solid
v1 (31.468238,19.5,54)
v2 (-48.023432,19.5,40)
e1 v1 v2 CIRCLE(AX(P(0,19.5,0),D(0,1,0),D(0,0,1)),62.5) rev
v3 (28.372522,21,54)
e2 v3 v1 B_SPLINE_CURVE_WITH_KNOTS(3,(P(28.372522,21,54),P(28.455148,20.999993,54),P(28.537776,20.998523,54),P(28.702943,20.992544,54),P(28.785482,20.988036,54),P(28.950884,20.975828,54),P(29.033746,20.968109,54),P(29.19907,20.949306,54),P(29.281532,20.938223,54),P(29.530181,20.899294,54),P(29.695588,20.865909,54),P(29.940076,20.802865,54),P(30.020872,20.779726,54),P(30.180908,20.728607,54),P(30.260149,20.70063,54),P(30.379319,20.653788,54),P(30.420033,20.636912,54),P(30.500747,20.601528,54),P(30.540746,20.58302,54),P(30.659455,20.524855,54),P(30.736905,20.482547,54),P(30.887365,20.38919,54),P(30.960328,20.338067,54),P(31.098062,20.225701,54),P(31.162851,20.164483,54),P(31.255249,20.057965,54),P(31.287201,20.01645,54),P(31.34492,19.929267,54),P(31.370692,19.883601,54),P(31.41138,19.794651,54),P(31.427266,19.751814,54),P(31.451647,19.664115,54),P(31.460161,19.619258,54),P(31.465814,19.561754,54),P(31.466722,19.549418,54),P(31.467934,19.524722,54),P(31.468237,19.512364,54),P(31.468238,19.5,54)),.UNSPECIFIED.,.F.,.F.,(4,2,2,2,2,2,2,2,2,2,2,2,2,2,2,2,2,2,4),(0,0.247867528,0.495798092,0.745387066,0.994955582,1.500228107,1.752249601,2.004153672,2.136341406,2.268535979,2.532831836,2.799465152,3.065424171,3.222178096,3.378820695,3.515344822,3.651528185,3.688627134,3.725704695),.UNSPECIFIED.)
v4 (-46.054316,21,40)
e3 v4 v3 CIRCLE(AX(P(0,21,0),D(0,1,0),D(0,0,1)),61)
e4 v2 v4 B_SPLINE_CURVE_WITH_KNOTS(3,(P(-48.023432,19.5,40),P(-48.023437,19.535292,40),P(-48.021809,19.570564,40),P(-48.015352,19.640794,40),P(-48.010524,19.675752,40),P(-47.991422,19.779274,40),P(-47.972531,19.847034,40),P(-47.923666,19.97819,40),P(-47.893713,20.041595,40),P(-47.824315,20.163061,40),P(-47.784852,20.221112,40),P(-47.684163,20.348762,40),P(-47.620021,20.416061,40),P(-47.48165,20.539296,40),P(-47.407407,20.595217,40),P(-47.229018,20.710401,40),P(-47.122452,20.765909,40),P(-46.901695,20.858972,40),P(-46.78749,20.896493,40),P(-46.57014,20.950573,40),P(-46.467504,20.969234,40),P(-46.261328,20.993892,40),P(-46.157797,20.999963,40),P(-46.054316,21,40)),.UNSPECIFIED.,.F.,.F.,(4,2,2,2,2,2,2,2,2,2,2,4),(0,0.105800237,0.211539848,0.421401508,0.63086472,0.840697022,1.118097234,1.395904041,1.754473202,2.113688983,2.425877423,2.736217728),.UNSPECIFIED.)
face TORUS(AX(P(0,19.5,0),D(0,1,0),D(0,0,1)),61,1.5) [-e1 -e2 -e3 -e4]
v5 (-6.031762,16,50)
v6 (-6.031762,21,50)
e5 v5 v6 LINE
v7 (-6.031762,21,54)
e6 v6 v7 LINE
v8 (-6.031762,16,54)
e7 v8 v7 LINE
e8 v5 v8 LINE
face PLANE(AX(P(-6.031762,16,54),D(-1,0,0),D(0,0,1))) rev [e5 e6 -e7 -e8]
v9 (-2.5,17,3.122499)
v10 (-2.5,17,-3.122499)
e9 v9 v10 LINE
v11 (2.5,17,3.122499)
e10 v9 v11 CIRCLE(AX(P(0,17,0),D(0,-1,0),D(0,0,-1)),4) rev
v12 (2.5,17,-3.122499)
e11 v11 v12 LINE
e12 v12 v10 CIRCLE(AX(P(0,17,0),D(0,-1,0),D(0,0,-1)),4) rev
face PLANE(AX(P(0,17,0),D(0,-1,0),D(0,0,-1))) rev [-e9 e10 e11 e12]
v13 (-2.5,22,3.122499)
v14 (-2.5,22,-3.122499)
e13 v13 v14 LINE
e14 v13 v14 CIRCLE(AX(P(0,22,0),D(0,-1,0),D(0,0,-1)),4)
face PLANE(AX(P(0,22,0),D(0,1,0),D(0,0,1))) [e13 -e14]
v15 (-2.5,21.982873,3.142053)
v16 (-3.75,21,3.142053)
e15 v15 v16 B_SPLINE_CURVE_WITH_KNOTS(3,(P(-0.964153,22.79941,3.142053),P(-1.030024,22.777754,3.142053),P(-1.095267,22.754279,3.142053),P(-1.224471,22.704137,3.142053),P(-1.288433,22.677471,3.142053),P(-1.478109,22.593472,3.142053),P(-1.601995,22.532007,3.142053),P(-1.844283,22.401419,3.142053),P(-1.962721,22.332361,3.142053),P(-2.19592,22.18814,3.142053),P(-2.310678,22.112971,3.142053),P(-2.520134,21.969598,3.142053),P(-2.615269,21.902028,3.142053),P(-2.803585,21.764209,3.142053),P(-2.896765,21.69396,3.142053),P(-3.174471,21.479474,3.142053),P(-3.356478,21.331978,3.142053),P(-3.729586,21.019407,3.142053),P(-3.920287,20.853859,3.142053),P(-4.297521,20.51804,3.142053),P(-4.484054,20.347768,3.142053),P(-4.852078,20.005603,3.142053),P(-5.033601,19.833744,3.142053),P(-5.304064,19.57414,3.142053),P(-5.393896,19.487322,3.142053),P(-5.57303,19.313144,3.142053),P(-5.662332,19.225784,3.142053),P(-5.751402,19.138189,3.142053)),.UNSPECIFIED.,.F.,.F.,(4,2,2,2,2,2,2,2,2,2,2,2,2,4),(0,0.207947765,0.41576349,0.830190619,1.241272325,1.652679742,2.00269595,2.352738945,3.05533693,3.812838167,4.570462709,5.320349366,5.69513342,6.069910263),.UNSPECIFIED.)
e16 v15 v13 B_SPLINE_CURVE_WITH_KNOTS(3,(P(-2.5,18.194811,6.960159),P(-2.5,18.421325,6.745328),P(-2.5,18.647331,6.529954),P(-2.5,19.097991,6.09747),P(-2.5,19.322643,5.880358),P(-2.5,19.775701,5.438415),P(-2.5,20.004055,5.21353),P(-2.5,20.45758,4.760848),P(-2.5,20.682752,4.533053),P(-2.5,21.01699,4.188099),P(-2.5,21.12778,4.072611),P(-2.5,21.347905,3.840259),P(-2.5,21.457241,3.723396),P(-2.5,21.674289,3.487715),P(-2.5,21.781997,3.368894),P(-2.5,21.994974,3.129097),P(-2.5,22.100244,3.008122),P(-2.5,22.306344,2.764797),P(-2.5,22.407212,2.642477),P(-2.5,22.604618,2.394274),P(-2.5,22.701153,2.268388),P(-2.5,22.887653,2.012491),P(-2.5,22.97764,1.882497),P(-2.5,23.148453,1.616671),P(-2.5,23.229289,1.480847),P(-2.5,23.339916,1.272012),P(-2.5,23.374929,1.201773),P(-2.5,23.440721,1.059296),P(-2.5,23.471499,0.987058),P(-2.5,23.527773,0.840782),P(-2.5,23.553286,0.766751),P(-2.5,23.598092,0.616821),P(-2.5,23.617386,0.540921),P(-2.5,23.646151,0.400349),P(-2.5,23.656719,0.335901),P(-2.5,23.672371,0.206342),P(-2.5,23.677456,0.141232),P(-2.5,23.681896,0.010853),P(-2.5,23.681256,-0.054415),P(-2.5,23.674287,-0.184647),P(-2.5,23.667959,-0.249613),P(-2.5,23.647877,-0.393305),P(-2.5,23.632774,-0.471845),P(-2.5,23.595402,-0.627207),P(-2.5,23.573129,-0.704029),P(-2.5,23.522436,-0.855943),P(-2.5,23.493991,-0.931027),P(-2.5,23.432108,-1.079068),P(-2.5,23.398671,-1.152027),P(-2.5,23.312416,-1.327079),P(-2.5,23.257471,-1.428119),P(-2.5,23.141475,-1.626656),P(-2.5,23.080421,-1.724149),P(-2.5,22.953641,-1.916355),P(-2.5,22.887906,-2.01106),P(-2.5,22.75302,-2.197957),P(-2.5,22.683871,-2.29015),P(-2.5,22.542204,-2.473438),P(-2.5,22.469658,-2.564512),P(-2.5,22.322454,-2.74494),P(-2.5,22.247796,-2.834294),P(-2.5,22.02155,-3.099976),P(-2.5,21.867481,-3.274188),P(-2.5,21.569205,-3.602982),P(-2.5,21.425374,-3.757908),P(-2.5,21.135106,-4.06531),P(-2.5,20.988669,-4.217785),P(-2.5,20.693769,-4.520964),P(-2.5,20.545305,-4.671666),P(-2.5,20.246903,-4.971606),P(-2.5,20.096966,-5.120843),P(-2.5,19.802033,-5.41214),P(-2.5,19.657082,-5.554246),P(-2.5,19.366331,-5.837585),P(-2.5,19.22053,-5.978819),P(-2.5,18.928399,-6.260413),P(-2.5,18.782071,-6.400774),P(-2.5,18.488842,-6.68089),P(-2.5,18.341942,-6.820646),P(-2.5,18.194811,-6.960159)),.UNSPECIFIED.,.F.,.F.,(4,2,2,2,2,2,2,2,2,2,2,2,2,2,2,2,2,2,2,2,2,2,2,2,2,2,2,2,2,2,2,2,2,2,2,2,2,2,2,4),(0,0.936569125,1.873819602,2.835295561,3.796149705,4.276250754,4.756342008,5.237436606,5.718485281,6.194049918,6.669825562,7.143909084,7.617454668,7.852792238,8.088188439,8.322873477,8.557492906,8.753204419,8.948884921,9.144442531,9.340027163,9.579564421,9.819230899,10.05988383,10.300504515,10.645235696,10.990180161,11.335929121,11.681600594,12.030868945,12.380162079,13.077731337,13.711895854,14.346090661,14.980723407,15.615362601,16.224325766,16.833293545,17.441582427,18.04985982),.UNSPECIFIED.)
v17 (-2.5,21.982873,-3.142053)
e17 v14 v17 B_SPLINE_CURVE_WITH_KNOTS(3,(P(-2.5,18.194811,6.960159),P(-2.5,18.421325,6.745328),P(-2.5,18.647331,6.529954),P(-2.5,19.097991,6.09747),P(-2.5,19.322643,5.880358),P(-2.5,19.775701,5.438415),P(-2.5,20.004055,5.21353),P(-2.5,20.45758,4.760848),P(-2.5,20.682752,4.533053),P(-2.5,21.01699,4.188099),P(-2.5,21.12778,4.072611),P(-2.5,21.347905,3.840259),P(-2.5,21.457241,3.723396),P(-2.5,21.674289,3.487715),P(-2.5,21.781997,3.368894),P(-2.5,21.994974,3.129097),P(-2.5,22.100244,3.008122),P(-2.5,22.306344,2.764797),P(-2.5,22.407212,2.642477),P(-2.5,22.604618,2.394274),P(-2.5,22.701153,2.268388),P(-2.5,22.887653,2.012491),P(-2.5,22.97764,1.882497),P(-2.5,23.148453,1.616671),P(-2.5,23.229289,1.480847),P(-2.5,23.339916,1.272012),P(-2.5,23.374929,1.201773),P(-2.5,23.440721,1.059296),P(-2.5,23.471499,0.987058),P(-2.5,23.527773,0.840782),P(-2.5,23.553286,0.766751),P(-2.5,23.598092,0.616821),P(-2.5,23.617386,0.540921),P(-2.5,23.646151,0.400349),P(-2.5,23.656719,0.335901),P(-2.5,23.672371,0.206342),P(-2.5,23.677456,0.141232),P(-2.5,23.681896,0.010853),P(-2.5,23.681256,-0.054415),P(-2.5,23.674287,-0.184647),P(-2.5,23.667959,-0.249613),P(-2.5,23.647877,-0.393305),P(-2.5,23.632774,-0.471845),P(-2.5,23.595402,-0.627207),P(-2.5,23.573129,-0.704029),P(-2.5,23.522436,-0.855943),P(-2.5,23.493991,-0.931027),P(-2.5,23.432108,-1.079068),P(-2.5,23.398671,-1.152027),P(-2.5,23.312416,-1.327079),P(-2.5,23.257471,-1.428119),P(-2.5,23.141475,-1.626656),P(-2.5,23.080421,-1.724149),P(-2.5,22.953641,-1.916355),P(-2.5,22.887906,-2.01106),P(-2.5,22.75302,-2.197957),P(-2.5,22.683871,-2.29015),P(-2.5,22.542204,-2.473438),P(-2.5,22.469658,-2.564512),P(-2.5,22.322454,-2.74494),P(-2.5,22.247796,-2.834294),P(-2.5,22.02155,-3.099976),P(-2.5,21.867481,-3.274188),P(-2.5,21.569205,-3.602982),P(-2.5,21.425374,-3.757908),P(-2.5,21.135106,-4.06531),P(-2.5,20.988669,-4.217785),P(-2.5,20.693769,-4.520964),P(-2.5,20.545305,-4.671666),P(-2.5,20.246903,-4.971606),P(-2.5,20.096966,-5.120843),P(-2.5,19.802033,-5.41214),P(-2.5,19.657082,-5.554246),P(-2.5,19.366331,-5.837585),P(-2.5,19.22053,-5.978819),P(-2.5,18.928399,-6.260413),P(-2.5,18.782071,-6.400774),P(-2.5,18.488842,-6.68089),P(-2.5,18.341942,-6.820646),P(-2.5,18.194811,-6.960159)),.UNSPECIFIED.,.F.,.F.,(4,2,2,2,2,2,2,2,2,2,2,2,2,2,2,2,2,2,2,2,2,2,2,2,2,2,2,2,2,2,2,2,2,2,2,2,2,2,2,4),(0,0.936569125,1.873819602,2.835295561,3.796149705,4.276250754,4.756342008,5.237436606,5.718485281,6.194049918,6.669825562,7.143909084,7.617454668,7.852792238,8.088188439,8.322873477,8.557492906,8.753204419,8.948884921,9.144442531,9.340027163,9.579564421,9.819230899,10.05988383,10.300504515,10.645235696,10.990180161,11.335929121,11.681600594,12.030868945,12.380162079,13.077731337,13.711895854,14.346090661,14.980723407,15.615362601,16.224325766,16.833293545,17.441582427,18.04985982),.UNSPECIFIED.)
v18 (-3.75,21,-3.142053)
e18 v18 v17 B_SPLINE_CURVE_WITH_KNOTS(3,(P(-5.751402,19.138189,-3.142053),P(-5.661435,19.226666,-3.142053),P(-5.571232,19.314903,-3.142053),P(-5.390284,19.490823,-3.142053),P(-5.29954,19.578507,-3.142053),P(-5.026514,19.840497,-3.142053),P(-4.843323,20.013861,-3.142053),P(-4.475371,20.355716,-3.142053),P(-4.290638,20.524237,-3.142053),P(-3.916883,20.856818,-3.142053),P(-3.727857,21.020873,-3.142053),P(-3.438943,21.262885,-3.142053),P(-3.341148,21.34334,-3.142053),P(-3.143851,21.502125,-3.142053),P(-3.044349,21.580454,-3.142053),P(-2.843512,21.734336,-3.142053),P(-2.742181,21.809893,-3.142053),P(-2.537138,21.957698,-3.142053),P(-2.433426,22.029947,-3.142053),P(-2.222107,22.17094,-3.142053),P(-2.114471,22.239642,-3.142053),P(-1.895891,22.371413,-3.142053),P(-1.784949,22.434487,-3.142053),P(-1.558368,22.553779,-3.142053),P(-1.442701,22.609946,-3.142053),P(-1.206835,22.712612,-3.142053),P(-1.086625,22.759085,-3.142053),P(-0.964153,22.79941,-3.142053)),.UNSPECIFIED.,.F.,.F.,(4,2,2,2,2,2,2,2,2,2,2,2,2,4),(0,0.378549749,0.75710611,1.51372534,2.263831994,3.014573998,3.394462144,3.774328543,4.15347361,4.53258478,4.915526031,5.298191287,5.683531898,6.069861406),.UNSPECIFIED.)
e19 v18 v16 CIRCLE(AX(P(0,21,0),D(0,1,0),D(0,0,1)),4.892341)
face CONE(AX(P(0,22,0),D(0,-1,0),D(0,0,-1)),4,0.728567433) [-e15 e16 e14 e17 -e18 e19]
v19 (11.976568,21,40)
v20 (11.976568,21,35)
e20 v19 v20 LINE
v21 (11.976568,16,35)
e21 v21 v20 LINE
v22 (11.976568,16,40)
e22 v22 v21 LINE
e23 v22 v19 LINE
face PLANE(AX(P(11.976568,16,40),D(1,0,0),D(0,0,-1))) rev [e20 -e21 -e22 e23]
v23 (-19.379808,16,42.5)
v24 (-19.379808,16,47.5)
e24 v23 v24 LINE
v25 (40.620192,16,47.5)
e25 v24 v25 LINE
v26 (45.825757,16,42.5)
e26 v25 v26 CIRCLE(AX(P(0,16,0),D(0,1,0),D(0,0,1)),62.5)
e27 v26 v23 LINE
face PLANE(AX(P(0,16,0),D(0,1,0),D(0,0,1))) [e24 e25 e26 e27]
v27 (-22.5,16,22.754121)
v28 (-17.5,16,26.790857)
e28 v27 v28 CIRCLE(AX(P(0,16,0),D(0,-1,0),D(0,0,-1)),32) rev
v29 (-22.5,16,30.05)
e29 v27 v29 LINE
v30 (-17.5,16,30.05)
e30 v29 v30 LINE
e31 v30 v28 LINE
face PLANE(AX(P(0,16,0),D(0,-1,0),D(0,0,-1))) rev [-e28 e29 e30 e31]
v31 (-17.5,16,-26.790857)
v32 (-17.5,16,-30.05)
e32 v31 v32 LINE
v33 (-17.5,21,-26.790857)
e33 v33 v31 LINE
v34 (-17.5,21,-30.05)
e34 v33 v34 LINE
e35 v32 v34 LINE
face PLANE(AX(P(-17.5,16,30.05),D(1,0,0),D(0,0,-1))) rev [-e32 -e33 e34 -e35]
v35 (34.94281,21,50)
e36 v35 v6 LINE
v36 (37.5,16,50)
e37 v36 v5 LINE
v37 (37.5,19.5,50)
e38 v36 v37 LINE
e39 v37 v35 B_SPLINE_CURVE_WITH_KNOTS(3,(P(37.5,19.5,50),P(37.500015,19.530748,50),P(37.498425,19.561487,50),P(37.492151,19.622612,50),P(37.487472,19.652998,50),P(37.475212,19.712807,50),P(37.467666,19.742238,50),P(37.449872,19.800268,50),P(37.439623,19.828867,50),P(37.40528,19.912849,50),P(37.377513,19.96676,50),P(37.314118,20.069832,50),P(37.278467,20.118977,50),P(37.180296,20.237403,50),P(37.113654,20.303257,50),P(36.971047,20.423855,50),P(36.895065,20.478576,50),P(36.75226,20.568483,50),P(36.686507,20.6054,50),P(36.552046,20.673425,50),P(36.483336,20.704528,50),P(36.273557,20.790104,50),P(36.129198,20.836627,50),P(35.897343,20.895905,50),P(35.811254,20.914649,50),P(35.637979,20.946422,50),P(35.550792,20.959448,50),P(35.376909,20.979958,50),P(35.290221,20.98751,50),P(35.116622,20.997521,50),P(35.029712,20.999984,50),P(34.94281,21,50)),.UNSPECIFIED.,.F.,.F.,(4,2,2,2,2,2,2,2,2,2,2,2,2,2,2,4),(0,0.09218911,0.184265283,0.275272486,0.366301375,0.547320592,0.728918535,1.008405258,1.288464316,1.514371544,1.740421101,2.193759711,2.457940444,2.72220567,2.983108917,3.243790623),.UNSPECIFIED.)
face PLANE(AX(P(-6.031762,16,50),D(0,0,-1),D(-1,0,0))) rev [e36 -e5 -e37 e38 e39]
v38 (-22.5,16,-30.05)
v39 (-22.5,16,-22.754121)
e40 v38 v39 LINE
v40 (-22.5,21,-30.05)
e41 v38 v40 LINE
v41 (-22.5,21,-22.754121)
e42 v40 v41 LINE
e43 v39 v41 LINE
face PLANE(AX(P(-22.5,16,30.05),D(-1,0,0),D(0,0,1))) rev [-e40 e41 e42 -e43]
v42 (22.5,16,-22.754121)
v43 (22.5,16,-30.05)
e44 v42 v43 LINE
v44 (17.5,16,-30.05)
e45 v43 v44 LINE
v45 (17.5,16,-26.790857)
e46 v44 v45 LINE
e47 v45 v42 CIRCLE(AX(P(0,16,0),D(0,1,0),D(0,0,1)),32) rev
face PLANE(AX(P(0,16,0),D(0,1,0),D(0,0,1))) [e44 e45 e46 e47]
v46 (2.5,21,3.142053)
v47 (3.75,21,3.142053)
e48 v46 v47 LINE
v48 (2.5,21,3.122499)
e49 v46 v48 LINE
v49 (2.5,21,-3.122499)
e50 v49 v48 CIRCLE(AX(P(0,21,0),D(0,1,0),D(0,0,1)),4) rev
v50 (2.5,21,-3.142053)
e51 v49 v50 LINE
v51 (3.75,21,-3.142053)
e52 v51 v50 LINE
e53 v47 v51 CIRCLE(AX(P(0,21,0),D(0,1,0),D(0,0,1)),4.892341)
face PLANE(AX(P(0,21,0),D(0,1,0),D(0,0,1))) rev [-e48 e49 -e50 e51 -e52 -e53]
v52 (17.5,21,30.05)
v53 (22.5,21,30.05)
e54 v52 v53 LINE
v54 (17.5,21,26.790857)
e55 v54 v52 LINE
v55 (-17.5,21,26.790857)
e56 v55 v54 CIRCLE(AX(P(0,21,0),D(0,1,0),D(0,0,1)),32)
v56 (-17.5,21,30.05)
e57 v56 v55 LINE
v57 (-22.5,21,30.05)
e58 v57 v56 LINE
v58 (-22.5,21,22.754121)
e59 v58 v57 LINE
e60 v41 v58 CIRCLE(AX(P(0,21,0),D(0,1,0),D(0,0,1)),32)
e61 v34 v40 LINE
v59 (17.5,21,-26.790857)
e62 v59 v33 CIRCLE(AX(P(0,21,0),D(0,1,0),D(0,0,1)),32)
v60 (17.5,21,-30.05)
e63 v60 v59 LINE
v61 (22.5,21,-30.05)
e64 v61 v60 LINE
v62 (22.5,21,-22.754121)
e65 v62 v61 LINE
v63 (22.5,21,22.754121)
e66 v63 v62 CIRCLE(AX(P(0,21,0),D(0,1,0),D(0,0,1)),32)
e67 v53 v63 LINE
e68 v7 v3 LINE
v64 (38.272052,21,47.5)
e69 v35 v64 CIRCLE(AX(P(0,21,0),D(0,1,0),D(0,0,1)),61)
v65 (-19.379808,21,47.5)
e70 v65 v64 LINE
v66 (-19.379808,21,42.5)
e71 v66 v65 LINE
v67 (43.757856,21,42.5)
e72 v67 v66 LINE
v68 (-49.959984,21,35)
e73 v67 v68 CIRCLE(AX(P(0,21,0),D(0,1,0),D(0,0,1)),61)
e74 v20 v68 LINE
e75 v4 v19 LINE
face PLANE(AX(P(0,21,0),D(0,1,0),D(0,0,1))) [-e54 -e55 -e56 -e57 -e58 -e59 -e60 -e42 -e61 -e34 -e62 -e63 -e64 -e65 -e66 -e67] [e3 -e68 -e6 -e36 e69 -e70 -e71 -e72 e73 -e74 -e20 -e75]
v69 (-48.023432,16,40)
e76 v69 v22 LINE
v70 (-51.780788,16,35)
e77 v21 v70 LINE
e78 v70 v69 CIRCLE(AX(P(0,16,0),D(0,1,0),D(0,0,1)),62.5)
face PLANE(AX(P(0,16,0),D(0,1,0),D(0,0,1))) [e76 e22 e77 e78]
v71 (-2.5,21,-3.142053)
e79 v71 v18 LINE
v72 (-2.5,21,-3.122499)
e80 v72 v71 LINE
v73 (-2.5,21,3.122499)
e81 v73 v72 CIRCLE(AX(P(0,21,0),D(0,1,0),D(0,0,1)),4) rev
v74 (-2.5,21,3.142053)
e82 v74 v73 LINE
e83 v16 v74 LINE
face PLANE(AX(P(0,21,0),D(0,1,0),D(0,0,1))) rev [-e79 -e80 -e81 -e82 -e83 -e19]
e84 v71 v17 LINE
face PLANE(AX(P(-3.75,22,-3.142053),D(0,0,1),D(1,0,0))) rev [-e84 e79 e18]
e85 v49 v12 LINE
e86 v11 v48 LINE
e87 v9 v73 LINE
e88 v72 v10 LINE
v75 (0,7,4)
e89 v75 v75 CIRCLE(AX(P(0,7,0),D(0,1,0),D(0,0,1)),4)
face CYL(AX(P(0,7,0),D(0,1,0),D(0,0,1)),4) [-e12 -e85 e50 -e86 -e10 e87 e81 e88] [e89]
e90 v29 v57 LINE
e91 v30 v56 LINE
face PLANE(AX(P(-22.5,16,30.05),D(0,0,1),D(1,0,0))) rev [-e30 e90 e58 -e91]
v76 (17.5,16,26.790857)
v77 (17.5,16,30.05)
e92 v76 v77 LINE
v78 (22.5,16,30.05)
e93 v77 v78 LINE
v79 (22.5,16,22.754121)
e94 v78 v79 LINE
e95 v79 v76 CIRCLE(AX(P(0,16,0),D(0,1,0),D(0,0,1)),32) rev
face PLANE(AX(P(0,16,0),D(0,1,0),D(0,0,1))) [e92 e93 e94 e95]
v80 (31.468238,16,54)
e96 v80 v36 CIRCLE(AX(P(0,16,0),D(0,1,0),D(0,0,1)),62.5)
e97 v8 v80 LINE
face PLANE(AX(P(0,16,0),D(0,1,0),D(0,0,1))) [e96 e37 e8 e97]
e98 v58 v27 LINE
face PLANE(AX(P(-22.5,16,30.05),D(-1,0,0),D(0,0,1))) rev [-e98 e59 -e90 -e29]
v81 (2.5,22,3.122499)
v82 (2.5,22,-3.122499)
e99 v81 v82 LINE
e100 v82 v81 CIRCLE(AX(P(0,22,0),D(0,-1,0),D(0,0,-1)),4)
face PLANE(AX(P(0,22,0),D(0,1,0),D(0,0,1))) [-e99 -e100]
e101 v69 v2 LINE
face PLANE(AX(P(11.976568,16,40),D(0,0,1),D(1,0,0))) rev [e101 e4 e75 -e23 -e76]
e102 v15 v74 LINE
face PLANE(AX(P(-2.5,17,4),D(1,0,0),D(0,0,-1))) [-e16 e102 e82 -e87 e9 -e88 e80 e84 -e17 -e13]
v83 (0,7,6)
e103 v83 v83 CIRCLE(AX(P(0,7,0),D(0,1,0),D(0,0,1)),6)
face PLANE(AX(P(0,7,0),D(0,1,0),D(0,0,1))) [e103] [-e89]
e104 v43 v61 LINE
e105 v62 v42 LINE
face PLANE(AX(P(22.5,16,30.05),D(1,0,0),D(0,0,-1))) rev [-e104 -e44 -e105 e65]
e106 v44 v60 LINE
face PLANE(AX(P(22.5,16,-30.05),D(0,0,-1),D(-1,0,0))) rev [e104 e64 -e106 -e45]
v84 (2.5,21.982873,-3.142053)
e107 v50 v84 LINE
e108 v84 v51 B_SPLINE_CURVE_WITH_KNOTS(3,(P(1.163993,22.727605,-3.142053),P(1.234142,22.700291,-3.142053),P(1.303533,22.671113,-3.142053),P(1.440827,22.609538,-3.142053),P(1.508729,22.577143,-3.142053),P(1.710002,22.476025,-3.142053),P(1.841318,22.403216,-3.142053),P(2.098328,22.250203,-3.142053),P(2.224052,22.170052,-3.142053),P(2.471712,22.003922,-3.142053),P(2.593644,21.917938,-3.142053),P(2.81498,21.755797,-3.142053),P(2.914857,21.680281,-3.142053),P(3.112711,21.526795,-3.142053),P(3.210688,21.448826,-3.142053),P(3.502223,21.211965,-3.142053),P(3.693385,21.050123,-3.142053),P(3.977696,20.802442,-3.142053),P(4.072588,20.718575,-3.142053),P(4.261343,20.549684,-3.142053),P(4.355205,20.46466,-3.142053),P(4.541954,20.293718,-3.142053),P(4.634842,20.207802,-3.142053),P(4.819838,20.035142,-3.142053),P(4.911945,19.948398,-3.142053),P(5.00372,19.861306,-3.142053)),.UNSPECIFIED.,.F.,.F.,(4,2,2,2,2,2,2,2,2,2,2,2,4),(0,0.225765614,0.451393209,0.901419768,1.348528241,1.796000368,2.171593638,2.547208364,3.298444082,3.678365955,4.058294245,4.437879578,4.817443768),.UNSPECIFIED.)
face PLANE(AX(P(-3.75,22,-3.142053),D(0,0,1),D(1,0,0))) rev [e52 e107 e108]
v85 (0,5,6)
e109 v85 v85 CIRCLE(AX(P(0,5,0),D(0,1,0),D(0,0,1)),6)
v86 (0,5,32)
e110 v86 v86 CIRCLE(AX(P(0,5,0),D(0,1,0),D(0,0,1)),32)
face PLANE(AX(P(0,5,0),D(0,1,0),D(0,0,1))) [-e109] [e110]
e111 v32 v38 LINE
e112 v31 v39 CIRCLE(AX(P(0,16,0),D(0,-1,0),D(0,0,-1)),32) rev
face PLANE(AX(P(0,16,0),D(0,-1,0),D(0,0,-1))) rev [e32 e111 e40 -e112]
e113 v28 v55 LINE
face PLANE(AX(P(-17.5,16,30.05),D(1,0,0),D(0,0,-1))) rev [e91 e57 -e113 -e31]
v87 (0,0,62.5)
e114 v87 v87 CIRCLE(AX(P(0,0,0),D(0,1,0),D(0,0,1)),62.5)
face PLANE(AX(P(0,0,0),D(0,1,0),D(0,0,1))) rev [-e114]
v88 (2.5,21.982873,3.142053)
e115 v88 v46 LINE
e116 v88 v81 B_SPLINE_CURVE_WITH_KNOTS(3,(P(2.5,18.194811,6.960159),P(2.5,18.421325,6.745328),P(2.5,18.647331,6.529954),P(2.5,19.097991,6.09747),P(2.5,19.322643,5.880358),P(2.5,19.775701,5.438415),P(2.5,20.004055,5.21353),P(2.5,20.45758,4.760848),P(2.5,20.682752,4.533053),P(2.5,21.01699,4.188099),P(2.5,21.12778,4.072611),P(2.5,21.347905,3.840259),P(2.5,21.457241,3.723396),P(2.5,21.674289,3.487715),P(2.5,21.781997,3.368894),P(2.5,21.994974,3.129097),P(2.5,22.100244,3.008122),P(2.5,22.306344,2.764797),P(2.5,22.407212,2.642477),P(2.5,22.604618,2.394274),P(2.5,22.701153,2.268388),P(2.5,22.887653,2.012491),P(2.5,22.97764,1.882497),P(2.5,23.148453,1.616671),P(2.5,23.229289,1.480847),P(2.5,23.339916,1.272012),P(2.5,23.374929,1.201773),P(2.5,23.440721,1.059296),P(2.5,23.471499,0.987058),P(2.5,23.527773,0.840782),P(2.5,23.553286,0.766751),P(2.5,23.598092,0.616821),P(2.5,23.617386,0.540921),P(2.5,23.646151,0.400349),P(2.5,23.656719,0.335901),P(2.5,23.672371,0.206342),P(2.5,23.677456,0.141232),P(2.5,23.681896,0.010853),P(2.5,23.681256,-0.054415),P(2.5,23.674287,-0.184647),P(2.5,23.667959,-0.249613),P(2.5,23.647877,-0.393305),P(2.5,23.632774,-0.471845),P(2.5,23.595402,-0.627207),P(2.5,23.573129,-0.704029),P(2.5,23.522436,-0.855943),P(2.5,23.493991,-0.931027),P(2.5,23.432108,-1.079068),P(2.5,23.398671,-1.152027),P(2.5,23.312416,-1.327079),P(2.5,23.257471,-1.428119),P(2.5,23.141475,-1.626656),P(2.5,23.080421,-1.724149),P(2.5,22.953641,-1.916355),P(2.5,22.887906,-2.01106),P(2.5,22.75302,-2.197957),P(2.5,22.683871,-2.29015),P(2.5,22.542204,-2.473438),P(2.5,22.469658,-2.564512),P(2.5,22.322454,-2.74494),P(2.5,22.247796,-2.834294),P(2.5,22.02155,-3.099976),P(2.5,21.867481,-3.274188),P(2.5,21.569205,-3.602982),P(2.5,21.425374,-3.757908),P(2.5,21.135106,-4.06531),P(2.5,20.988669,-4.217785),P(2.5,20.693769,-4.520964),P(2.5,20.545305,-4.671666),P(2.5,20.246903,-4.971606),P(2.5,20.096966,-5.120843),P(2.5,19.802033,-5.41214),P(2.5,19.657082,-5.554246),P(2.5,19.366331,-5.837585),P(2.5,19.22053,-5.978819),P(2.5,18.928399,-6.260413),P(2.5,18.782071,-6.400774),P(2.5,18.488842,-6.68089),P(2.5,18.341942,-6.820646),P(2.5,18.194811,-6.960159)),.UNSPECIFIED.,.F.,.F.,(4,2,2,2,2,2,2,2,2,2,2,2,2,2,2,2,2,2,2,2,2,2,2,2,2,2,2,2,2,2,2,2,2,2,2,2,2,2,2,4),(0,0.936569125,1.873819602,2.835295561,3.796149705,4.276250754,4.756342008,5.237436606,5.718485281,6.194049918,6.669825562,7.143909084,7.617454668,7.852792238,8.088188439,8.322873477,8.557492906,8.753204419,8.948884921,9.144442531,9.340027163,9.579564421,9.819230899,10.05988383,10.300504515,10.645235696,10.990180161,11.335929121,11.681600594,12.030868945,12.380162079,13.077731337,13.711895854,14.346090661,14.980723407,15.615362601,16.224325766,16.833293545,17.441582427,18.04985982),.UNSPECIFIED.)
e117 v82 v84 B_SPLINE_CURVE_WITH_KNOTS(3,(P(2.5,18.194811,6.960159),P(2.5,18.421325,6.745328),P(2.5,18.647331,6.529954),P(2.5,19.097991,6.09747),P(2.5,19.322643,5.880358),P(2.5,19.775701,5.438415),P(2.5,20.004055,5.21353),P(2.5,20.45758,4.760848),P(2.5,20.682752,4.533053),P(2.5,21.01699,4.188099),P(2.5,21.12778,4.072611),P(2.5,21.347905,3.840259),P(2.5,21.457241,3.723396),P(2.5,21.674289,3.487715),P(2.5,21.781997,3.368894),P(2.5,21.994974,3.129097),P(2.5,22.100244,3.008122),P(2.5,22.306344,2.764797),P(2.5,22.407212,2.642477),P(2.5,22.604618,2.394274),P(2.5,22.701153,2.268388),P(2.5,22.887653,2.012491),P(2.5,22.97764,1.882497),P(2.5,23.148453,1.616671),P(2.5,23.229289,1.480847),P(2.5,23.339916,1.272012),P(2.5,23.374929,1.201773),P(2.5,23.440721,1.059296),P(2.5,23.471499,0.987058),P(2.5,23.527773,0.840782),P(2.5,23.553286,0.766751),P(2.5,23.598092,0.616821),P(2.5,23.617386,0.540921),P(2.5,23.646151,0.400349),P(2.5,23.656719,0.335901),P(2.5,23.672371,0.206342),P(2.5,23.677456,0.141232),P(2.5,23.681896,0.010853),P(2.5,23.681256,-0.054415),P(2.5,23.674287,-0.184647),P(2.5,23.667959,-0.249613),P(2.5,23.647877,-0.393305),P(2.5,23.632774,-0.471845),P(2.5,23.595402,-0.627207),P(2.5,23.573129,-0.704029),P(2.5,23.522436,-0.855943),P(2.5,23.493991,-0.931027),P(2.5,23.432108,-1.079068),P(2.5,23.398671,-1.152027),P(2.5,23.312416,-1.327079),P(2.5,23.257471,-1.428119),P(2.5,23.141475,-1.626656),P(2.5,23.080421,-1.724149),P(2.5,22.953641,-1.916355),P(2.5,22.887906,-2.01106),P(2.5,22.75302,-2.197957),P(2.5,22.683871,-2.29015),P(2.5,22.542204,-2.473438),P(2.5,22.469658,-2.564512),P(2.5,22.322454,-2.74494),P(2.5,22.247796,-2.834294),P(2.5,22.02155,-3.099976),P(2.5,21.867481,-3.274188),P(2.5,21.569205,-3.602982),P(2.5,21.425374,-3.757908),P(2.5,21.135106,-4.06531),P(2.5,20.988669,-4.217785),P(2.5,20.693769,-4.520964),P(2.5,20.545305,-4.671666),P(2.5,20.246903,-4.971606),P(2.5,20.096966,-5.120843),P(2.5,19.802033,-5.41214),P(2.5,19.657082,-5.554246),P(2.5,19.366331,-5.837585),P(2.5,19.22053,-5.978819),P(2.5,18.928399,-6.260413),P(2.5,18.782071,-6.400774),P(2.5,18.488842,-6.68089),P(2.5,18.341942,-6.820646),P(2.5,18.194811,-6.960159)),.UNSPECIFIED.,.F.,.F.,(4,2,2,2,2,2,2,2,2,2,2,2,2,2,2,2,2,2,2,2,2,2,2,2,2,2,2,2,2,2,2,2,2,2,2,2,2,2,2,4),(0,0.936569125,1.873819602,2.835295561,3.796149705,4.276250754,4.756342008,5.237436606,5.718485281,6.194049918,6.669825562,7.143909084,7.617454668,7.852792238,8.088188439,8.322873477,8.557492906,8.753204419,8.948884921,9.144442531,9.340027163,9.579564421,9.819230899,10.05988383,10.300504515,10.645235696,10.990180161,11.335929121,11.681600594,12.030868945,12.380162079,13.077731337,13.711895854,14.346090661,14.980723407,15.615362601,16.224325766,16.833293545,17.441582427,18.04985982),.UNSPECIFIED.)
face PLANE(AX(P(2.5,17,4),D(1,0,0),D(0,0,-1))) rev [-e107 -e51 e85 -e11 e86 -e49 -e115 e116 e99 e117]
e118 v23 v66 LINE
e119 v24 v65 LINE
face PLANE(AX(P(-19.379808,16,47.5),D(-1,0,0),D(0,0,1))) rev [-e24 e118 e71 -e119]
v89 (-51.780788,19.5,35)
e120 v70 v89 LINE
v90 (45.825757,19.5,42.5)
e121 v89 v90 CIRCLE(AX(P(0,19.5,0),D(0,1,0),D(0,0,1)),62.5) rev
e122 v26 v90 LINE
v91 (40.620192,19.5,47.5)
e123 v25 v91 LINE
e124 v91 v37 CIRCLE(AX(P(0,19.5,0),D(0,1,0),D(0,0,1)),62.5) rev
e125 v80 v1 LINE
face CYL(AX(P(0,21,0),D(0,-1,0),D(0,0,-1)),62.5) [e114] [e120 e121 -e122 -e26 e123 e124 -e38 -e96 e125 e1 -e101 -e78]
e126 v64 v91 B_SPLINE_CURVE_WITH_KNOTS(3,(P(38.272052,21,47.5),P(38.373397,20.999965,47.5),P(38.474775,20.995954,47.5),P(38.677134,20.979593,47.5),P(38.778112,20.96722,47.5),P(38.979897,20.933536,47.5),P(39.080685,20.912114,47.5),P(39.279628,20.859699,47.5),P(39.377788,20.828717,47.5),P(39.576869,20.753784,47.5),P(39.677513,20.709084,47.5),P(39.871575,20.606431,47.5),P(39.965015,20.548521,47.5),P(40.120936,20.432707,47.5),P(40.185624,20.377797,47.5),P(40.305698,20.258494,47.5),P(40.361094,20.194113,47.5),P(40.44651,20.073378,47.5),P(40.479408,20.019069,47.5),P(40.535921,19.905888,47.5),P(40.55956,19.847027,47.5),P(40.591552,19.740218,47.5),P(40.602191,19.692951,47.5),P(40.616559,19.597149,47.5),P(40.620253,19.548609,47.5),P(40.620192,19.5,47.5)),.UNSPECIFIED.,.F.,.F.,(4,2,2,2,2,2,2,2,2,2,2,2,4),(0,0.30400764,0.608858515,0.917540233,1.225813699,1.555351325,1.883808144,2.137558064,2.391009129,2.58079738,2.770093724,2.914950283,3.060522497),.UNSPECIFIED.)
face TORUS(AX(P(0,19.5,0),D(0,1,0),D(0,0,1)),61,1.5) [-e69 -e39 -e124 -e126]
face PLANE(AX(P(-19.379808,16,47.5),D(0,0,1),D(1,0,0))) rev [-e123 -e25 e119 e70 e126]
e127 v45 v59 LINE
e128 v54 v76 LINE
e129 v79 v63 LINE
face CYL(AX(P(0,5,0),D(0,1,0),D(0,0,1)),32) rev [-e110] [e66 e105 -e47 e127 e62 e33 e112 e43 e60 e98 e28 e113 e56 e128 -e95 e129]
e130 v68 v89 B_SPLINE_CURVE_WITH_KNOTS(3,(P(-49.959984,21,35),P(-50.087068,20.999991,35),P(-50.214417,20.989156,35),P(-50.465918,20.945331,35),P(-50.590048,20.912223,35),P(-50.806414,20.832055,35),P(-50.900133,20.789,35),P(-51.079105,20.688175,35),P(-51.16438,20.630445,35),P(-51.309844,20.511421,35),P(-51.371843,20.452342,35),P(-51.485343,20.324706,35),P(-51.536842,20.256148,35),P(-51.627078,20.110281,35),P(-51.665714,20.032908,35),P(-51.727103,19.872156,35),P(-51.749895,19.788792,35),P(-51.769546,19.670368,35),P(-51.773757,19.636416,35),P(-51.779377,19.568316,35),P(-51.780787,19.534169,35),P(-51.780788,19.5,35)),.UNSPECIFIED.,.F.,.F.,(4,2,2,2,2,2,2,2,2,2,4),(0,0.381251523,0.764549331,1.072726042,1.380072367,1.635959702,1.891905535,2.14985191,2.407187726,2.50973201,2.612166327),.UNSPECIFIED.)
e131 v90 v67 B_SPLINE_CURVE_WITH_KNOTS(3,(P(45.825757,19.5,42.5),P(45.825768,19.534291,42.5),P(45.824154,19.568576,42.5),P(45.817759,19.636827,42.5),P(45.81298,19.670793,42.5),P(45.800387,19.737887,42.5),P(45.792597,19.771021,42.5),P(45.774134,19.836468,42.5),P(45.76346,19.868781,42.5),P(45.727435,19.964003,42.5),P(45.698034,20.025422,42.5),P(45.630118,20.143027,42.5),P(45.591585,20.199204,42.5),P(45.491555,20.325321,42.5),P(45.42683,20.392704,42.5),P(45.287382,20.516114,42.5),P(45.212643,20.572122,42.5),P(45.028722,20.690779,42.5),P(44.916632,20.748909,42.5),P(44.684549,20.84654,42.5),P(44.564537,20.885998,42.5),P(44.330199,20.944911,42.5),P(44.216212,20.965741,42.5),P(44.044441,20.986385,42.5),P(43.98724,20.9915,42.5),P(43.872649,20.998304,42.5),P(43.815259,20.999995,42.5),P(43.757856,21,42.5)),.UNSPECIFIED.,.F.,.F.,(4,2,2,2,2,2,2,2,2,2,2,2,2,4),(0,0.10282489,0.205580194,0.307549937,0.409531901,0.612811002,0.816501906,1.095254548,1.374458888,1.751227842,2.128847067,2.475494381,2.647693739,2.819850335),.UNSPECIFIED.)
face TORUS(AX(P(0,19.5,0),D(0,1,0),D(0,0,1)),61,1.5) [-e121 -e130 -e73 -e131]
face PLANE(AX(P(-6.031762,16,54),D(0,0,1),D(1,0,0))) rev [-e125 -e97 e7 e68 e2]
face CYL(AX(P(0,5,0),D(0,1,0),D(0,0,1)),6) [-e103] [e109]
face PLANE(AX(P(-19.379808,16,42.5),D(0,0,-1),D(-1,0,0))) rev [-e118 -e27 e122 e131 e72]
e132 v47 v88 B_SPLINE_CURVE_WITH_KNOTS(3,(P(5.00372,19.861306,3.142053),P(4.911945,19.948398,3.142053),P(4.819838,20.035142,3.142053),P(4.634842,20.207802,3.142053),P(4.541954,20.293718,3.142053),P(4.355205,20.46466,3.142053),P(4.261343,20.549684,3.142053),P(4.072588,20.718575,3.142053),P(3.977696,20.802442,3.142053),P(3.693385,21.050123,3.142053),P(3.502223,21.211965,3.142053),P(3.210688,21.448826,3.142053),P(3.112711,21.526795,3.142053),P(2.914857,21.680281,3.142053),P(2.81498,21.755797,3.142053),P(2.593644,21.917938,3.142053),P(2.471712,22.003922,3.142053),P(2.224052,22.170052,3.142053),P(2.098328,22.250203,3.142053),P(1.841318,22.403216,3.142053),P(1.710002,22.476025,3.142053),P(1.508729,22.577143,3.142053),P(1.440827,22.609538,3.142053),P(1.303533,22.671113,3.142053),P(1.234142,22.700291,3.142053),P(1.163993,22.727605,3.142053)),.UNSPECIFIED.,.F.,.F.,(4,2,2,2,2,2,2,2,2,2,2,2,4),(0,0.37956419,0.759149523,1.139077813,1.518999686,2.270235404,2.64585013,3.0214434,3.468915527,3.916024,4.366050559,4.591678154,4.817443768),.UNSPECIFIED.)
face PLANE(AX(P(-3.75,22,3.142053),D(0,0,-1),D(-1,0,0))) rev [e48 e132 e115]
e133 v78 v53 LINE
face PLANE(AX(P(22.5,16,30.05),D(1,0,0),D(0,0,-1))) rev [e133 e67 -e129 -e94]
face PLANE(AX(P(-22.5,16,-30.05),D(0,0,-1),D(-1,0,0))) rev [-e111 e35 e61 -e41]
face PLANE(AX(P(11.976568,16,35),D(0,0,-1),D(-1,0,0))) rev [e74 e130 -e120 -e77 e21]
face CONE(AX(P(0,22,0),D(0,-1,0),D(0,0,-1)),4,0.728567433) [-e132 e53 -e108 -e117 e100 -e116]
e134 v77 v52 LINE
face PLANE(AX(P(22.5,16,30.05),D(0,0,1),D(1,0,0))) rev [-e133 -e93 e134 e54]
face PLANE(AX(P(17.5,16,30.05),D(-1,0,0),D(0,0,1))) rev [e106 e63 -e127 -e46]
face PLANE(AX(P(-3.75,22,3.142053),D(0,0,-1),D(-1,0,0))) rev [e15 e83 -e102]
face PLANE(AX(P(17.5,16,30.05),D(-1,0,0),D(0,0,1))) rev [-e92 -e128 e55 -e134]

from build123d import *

# Parameters (mm, degrees)
SKETCH1_R           = 62.5
BOSS_EXTRUDE1_DEPTH = 21
SKETCH2_R           = 32
SKETCH2_R_2         = 6
CUT_EXTRUDE1_DEPTH  = 16
SKETCH3_R           = 6
SKETCH3_R_2         = 4
CUT_EXTRUDE2_DEPTH  = 14
CUT_EXTRUDE7_START  = -5
CUT_EXTRUDE7_DEPTH  = 5
FILLET1_R           = 1.5
BOSS_EXTRUDE2_START = 1
SKETCH12_R          = 4
BOSS_EXTRUDE2_DEPTH = 1
BOSS_EXTRUDE3_DEPTH = 1
SKETCH14_W          = 5
SKETCH14_H          = 8
CUT_EXTRUDE9_DEPTH  = 5


# Read off the part's stored shape, not the designer's step: Cut-Extrude7
with BuildPart() as part:
    # Sketch1 → Boss-Extrude1 (new body)
    with BuildSketch(Plane(origin=(0, 0, 0), x_dir=(1, 0, 0), z_dir=(0, 1, 0))):
        with Locations(Location((0, 0, 0), (0, 0, 90))):
            Circle(SKETCH1_R)
    extrude(amount=BOSS_EXTRUDE1_DEPTH)

    # Sketch2 → Cut-Extrude1 (cut)
    with BuildSketch(Plane(origin=(0, 21, 0), x_dir=(1, 0, 0), z_dir=(0, 1, 0))):
        with Locations(Location((0, 0, 0), (0, 0, 270))):
            Circle(SKETCH2_R)
        with Locations(Location((0, 0, 0), (0, 0, 270))):
            Circle(SKETCH2_R_2, mode=Mode.SUBTRACT)
    extrude(amount=-CUT_EXTRUDE1_DEPTH, mode=Mode.SUBTRACT)

    # Sketch3 → Cut-Extrude2 (cut)
    with BuildSketch(Plane(origin=(0, 21, 0), x_dir=(1, 0, 0), z_dir=(0, 1, 0))):
        with Locations(Location((0, 0, 0), (0, 0, 270))):
            Circle(SKETCH3_R)
        with Locations(Location((0, 0, 0), (0, 0, 270))):
            Circle(SKETCH3_R_2, mode=Mode.SUBTRACT)
    extrude(amount=-CUT_EXTRUDE2_DEPTH, mode=Mode.SUBTRACT)

    # Cut-Extrude7 outline → Cut-Extrude7 (cut)
    with BuildSketch(Plane(origin=(0, 21, 0), x_dir=(1, 0, 0), z_dir=(0, 1, 0)).offset(CUT_EXTRUDE7_START)):
        with BuildLine():
            Line((-48.023431781, -40), (11.976568219, -40))
            Line((11.976568219, -40), (11.976568219, -35))
            Line((11.976568219, -35), (-51.780787943, -35))
            ThreePointArc((-51.780787943, -35), (-49.964693221, -37.547029594), (-48.023431781, -40))
        make_face()
        with BuildLine():
            Line((-6.031762045, -54), (31.468237955, -54))
            ThreePointArc((31.468237955, -54), (34.542067999, -52.087383677), (37.5, -50))
            Line((37.5, -50), (-6.031762045, -50))
            Line((-6.031762045, -50), (-6.031762045, -54))
        make_face()
        with BuildLine():
            ThreePointArc((40.620192023, -47.5), (43.295213632, -45.075209113), (45.82575695, -42.5))
            Line((45.82575695, -42.5), (-19.379807977, -42.5))
            Line((-19.379807977, -42.5), (-19.379807977, -47.5))
            Line((-19.379807977, -47.5), (40.620192023, -47.5))
        make_face()
        with BuildLine():
            ThreePointArc((-17.5, -26.790856649), (-20.101587243, -24.898317018), (-22.5, -22.754120506))
            Line((-22.5, -22.754120506), (-22.5, -30.05))
            Line((-22.5, -30.05), (-17.5, -30.05))
            Line((-17.5, -30.05), (-17.5, -26.790856649))
        make_face()
        with BuildLine():
            Line((-22.5, 30.05), (-22.5, 22.754120506))
            ThreePointArc((-22.5, 22.754120506), (-20.101587243, 24.898317018), (-17.5, 26.790856649))
            Line((-17.5, 26.790856649), (-17.5, 30.05))
            Line((-17.5, 30.05), (-22.5, 30.05))
        make_face()
        with BuildLine():
            ThreePointArc((22.5, -22.754120506), (20.101587243, -24.898317018), (17.5, -26.790856649))
            Line((17.5, -26.790856649), (17.5, -30.05))
            Line((17.5, -30.05), (22.5, -30.05))
            Line((22.5, -30.05), (22.5, -22.754120506))
        make_face()
        with BuildLine():
            Line((17.5, 30.05), (17.5, 26.790856649))
            ThreePointArc((17.5, 26.790856649), (20.101587243, 24.898317018), (22.5, 22.754120506))
            Line((22.5, 22.754120506), (22.5, 30.05))
            Line((22.5, 30.05), (17.5, 30.05))
        make_face()
    extrude(amount=CUT_EXTRUDE7_DEPTH, mode=Mode.SUBTRACT)

    # Fillet1
    fillet1_edges = [part.edges().sort_by_distance(p)[0] for p in [
        (-10.840600106, 21, 61.552671667),
        (39.080092124, 21, 48.774956684),
        (57.282196187, 21, -25),
    ]]
    fillet(fillet1_edges, radius=FILLET1_R)

    # Sketch12 → Boss-Extrude2 (add)
    with BuildSketch(Plane(origin=(0, 21, 0), x_dir=(1, 0, 0), z_dir=(0, 1, 0)).offset(BOSS_EXTRUDE2_START)):
        with Locations(Location((0, 0, 0), (0, 0, 270))):
            Circle(SKETCH12_R)
    extrude(amount=-BOSS_EXTRUDE2_DEPTH)

    # Sketch13 → Boss-Extrude3 (add)
    with BuildSketch(Plane(origin=(0, 21, 0), x_dir=(1, 0, 0), z_dir=(0, 1, 0))):
        with BuildLine():
            Line((-3.75, -3.142053469), (3.75, -3.142053469))
            ThreePointArc((3.75, -3.142053469), (4.892340953, 0), (3.75, 3.142053469))
            Line((3.75, 3.142053469), (-3.75, 3.142053469))
            ThreePointArc((-3.75, 3.142053469), (-4.892340953, 0), (-3.75, -3.142053469))
        make_face()
    extrude(amount=BOSS_EXTRUDE3_DEPTH)

    # Sketch14 → Cut-Extrude9 (cut)
    with BuildSketch(Plane(origin=(0, 22, 0), x_dir=(1, 0, 0), z_dir=(0, 1, 0))):
        Rectangle(SKETCH14_W, SKETCH14_H)
    extrude(amount=-CUT_EXTRUDE9_DEPTH, mode=Mode.SUBTRACT)

    # Sketch16 → Cut-Revolve1 (revolve, cut)
    with BuildSketch(Plane.XY, mode=Mode.PRIVATE) as cut_revolve1_sk:
        Polygon((4.892340953, 21), (4, 22), (4.892340953, 22), align=None)
    revolve(cut_revolve1_sk.sketch.rotate(Axis((0, 0, 0), (0, 1, 0)), 214.055797743), axis=Axis((0, 0, 0), (0, 1, 0)), mode=Mode.SUBTRACT)


solid = part.part
